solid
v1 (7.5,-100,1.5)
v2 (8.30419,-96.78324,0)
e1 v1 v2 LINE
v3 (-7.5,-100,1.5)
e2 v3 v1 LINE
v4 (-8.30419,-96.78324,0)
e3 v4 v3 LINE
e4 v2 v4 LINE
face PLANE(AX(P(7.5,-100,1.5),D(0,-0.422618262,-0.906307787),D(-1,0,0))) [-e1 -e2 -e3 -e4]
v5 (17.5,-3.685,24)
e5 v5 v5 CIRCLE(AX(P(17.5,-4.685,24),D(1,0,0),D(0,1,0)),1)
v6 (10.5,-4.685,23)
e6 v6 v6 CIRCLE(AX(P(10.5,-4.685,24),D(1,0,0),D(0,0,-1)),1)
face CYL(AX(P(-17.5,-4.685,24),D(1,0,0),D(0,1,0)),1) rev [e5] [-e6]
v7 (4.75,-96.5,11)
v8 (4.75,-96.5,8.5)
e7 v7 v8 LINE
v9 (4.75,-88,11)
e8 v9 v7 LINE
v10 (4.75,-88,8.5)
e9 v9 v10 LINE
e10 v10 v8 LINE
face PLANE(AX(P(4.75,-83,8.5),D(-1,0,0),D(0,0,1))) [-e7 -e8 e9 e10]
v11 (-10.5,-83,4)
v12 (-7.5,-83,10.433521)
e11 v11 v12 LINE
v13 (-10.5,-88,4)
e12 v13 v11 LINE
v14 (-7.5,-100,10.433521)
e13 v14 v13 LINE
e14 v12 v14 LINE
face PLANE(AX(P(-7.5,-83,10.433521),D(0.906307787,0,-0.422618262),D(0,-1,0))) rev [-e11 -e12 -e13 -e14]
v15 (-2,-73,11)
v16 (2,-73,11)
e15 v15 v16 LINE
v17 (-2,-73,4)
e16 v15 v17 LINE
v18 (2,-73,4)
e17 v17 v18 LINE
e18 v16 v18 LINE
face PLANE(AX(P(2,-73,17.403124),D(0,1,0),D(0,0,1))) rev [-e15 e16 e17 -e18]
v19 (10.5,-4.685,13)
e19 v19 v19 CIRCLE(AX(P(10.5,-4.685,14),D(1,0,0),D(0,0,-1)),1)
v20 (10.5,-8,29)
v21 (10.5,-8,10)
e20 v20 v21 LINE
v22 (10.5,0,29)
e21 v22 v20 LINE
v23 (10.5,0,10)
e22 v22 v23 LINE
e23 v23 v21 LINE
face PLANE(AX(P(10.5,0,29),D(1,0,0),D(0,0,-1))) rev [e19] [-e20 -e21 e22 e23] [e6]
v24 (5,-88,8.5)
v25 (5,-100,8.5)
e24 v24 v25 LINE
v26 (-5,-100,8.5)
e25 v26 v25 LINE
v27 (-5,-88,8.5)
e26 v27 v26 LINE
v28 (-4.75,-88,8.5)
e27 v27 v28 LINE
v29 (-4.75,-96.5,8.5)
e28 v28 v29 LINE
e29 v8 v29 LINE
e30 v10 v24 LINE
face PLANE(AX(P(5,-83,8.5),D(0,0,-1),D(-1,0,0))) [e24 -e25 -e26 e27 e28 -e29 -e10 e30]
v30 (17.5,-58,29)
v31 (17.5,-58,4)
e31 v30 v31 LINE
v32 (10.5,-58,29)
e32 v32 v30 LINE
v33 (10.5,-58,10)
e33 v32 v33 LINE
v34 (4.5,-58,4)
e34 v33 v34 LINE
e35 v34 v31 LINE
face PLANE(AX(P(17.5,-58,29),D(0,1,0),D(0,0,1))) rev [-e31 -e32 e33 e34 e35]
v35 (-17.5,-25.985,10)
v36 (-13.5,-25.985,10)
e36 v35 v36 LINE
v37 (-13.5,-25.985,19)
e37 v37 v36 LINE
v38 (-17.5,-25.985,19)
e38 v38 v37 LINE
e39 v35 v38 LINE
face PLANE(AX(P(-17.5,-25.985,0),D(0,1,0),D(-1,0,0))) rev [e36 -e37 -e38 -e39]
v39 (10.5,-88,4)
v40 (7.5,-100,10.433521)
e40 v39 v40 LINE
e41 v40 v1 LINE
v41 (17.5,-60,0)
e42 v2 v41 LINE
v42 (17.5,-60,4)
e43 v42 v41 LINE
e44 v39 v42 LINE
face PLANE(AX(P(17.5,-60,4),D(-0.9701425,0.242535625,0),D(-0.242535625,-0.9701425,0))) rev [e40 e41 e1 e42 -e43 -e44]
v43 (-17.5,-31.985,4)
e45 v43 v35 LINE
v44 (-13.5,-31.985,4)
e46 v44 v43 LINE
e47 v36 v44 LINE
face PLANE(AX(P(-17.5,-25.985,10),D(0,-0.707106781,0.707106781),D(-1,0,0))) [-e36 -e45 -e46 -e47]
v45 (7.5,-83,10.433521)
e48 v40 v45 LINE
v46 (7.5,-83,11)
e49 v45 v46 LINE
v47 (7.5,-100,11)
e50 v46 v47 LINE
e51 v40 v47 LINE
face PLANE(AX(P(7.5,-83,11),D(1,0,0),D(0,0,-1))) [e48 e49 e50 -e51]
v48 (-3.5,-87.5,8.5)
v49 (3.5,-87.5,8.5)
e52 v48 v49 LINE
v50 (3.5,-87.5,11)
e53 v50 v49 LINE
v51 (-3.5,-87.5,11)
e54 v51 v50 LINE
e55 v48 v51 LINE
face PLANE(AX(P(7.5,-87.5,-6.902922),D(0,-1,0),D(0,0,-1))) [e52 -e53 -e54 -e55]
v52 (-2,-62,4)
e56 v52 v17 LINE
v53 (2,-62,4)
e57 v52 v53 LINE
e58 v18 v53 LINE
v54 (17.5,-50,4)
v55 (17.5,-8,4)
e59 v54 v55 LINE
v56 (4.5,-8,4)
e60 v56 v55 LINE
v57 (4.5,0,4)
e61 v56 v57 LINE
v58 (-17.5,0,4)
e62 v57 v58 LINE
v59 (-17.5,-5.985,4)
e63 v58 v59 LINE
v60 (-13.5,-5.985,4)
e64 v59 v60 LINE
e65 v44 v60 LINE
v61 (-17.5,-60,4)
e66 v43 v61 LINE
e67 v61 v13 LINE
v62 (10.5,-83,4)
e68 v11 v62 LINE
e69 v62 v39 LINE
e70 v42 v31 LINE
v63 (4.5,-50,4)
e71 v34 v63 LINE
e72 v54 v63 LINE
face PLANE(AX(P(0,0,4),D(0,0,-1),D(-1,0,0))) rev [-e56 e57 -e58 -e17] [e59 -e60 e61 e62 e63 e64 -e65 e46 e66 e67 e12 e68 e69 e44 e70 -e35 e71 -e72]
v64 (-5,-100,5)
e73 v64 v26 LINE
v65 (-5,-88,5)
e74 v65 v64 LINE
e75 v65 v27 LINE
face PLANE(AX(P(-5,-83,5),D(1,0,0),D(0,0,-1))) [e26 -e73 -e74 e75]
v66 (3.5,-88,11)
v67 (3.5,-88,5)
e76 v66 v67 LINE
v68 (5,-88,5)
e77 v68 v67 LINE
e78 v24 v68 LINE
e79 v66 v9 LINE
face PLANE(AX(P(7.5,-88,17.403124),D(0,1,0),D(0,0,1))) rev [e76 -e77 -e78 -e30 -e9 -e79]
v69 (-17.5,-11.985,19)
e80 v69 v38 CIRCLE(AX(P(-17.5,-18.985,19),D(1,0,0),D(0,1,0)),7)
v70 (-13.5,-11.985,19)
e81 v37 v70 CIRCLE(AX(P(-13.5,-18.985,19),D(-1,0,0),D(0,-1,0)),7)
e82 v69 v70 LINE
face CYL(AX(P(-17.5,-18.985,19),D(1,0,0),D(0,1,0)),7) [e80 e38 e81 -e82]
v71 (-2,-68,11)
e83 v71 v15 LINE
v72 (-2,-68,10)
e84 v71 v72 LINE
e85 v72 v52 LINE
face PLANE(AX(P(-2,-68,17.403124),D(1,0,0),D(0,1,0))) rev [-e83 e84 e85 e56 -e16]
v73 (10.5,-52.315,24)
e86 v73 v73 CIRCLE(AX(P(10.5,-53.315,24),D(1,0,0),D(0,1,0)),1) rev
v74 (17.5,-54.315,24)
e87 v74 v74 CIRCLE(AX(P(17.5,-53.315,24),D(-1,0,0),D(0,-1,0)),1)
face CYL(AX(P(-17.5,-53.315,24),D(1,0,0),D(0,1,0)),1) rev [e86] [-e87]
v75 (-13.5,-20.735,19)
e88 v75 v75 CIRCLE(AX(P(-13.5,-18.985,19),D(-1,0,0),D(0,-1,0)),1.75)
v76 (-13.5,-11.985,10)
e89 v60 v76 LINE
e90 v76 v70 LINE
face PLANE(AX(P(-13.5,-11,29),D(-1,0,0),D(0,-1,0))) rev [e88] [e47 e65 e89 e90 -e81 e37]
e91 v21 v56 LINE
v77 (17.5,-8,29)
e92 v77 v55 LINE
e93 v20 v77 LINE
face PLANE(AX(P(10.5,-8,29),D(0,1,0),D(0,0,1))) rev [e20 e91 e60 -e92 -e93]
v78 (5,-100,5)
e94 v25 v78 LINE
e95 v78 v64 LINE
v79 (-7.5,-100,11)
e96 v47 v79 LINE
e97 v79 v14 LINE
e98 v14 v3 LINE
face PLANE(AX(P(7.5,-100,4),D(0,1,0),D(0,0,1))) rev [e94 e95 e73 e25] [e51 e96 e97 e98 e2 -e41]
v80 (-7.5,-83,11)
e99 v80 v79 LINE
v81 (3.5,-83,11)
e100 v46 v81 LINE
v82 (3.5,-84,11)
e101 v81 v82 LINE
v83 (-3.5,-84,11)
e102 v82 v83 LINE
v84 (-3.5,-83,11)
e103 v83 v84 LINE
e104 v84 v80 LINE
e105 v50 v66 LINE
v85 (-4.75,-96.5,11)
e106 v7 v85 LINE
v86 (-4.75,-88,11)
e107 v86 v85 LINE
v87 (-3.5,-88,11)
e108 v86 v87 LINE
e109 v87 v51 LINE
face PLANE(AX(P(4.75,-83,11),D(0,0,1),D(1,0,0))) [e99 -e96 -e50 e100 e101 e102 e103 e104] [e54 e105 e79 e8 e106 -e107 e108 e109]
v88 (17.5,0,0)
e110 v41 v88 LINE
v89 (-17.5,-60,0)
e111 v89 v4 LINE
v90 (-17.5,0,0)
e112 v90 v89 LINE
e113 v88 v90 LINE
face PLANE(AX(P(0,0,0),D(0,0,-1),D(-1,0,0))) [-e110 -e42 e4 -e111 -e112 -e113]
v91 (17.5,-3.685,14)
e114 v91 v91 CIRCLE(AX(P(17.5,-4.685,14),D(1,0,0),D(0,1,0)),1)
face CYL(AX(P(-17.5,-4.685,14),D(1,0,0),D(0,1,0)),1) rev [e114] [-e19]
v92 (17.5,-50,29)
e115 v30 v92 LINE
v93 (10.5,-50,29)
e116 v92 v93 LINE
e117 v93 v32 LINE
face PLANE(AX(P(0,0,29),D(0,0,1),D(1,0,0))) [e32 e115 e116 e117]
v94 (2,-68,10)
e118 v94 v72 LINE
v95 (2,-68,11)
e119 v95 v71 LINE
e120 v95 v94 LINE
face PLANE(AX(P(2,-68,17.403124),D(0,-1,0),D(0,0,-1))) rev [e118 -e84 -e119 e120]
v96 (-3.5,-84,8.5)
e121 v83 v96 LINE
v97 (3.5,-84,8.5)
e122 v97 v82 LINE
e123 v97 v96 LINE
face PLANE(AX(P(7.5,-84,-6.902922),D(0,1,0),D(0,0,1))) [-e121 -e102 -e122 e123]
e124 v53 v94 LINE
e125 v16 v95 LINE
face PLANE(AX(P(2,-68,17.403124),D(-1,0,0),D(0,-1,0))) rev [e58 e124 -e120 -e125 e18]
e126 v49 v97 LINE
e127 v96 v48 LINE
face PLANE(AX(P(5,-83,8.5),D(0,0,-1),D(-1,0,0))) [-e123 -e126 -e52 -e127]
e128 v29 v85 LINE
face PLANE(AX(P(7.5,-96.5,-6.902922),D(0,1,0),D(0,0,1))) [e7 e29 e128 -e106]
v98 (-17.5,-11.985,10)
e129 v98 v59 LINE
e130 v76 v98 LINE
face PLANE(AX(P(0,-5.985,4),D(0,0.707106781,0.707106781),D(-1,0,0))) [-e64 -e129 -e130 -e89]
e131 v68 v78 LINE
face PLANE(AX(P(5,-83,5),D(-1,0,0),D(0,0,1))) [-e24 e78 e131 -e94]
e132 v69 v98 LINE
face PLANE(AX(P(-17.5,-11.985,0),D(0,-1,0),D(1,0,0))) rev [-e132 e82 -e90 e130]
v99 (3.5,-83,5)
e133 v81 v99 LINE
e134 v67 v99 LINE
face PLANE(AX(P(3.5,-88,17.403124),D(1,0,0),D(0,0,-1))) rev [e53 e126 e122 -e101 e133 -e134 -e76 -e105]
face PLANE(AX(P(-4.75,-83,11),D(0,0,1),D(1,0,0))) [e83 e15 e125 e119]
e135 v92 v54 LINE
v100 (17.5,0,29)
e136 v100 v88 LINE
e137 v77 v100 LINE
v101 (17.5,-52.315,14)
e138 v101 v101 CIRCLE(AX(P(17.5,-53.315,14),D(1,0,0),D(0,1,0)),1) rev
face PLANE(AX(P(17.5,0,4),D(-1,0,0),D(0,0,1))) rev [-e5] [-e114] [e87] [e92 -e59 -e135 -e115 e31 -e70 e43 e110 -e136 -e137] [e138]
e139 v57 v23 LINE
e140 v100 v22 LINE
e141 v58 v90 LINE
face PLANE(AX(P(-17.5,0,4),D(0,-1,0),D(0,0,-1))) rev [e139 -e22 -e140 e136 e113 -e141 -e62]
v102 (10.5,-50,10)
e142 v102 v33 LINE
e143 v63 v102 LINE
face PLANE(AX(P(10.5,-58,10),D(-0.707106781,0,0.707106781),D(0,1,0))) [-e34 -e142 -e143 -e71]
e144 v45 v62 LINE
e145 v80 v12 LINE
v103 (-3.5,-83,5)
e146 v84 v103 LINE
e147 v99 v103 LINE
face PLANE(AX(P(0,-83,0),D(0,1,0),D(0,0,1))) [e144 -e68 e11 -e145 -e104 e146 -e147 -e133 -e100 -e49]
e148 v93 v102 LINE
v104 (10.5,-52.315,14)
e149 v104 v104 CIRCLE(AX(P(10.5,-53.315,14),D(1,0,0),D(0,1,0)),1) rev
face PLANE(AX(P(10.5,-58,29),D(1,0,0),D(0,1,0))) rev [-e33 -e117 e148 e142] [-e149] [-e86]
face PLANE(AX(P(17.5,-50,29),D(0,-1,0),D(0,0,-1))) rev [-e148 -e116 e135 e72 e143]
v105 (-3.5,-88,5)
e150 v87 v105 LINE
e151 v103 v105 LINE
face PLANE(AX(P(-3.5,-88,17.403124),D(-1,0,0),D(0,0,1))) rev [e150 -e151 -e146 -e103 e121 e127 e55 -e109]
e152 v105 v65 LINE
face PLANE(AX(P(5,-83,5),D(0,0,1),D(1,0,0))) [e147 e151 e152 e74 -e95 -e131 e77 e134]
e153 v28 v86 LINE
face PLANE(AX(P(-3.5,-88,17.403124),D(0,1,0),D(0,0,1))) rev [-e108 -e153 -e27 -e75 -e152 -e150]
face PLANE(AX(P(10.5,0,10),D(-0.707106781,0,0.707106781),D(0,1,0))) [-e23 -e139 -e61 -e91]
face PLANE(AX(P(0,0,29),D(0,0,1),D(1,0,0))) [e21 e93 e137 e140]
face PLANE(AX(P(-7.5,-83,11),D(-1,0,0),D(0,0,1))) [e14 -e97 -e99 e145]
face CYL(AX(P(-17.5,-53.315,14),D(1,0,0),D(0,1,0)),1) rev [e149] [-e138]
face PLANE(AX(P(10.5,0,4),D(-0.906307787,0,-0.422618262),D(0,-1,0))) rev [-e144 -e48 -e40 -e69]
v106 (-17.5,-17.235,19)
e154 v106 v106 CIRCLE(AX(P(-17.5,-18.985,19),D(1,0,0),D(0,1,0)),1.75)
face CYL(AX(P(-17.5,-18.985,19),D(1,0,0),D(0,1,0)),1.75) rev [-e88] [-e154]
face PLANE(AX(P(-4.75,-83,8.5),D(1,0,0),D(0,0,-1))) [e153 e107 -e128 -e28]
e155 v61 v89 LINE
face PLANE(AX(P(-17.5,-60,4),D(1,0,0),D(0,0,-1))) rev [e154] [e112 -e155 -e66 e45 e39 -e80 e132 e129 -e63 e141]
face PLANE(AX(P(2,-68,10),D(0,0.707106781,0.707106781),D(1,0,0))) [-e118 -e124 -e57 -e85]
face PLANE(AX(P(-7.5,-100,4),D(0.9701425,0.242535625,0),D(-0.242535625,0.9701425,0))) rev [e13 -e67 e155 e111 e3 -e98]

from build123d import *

# Parameters (mm, degrees)
RESSALTO_EXTRUS_O1_DEPTH    = 4
ESBO_O2_W                   = 7
ESBO_O2_H                   = 8
ESBO_O2_W_2                 = 4
ESBO_O2_H_2                 = 16
RESSALTO_EXTRUS_O2_DEPTH    = 25
CORTE_EXTRUS_O1_START       = -35
CORTE_EXTRUS_O1_OUTLINE_R   = 1.75
CORTE_EXTRUS_O1_OUTLINE_R_2 = 1
CORTE_EXTRUS_O1_DEPTH       = 35
RESSALTO_EXTRUS_O3_DEPTH    = 17
RESSALTO_EXTRUS_O4_REACH    = 106.553
ESBO_O7_W                   = 4
ESBO_O7_H                   = 5
ESBO_O8_W                   = 15
ESBO_O8_H                   = 3.5
RESSALTO_EXTRUS_O5_DEPTH    = 2.5
CHANFRO1_SIZE               = 6
CHANFRO2_SIZE               = 3
CHANFRO2_SIZE2              = 6.433520762
CHANFRO3_SIZE               = 1.5
CHANFRO3_SIZE2              = 3.216760381


# Read off the part's stored shape, not the designer's step: Corte-extrusão1
with BuildPart() as part:
    # Esboço1 → Ressalto-extrusão1 (new body)
    with BuildSketch(Plane.XY):
        Polygon((-17.5, 0), (17.5, 0), (17.5, -60), (7.5, -100), (-7.5, -100), (-17.5, -60), align=None)
    extrude(amount=RESSALTO_EXTRUS_O1_DEPTH)

    # Esboço2 → Ressalto-extrusão2 (add)
    with BuildSketch(Plane.XY.offset(4)):
        with Locations((14, -54)):
            Rectangle(ESBO_O2_W, ESBO_O2_H)
        with Locations((14, -4)):
            Rectangle(ESBO_O2_W, ESBO_O2_H)
        with Locations((-15.5, -19)):
            Rectangle(ESBO_O2_W_2, ESBO_O2_H_2)
    extrude(amount=RESSALTO_EXTRUS_O2_DEPTH)

    # Corte-extrusão1 outline → Corte-extrusão1 (cut)
    with BuildSketch(Plane(origin=(17.5, 0, 0), x_dir=(0, 0, -1), z_dir=(1, 0, 0)).offset(CORTE_EXTRUS_O1_START)):
        with Locations((-19, -18.985)):
            Circle(CORTE_EXTRUS_O1_OUTLINE_R)
        with BuildLine():
            ThreePointArc((-19, -25.985), (-26, -18.985), (-19, -11.985))
            Line((-19, -11.985), (-4, -11.985))
            Line((-4, -11.985), (-4, -11))
            Line((-4, -11), (-29, -11))
            Line((-29, -11), (-29, -27))
            Line((-29, -27), (-4, -27))
            Line((-4, -27), (-4, -25.985))
            Line((-4, -25.985), (-19, -25.985))
        make_face()
        with Locations((-24, -4.685)):
            Circle(CORTE_EXTRUS_O1_OUTLINE_R_2)
        with Locations((-14, -4.685)):
            Circle(CORTE_EXTRUS_O1_OUTLINE_R_2)
        with Locations((-14, -53.315)):
            Circle(CORTE_EXTRUS_O1_OUTLINE_R_2)
        with Locations((-24, -53.315)):
            Circle(CORTE_EXTRUS_O1_OUTLINE_R_2)
    extrude(amount=CORTE_EXTRUS_O1_DEPTH, mode=Mode.SUBTRACT)

    # Esboço6 → Ressalto-extrusão3 (add)
    with BuildSketch(Plane.XZ.offset(100)):
        Polygon((-5, 5), (-5, 8.5), (-4.75, 8.5), (-4.75, 11), (-7.5, 11), (-7.5, 4), (7.5, 4), (7.5, 11), (4.75, 11), (4.75, 8.5), (5, 8.5), (5, 5), align=None)
    extrude(amount=-RESSALTO_EXTRUS_O3_DEPTH)

    # Ressalto-extrusão4: up to this face of the body (flat: up to its plane)
    ressalto_extrus_o4_end = Plane(part.part.faces().sort_by_distance((-6.125, -91.5, 11))[0])
    # Esboço7 → Ressalto-extrusão4 (add, up to the picked face)
    with BuildSketch(Plane.XY.offset(4), mode=Mode.PRIVATE) as ressalto_extrus_o4_sk1:
        with Locations((0, -70.5)):
            Rectangle(ESBO_O7_W, ESBO_O7_H)
    ressalto_extrus_o4_tool1 = split(extrude(ressalto_extrus_o4_sk1.sketch, amount=RESSALTO_EXTRUS_O4_REACH, mode=Mode.PRIVATE), bisect_by=ressalto_extrus_o4_end, keep=Keep.BOTH, mode=Mode.PRIVATE)
    # Esboço7 → Ressalto-extrusão4 (add, up to the picked face)
    with BuildSketch(Plane.XY.offset(4), mode=Mode.PRIVATE) as ressalto_extrus_o4_sk2:
        with Locations((5.5, -85.5)):
            Rectangle(ESBO_O7_W, ESBO_O7_H)
    ressalto_extrus_o4_tool2 = split(extrude(ressalto_extrus_o4_sk2.sketch, amount=RESSALTO_EXTRUS_O4_REACH, mode=Mode.PRIVATE), bisect_by=ressalto_extrus_o4_end, keep=Keep.BOTH, mode=Mode.PRIVATE)
    # Esboço7 → Ressalto-extrusão4 (add, up to the picked face)
    with BuildSketch(Plane.XY.offset(4), mode=Mode.PRIVATE) as ressalto_extrus_o4_sk3:
        with Locations((-5.5, -85.5)):
            Rectangle(ESBO_O7_W, ESBO_O7_H)
    ressalto_extrus_o4_tool3 = split(extrude(ressalto_extrus_o4_sk3.sketch, amount=RESSALTO_EXTRUS_O4_REACH, mode=Mode.PRIVATE), bisect_by=ressalto_extrus_o4_end, keep=Keep.BOTH, mode=Mode.PRIVATE)
    add(ressalto_extrus_o4_tool1.solids().sort_by(Axis((0, -70.5, 4), (0, 0, 1)))[0])
    add(ressalto_extrus_o4_tool2.solids().sort_by(Axis((5.5, -85.5, 4), (0, 0, 1)))[0])
    add(ressalto_extrus_o4_tool3.solids().sort_by(Axis((-5.5, -85.5, 4), (0, 0, 1)))[0])

    # Esboço8 → Ressalto-extrusão5 (add)
    with BuildSketch(Plane.XY.offset(11)):
        with Locations((0, -98.25)):
            Rectangle(ESBO_O8_W, ESBO_O8_H)
        with Locations((0, -85.75)):
            Rectangle(ESBO_O8_W, ESBO_O8_H)
    extrude(amount=-RESSALTO_EXTRUS_O5_DEPTH)

    # Chanfro1
    chanfro1_edges = [part.edges().sort_by_distance(p)[0] for p in [
        (0, -68, 4),
        (10.5, -54, 4),
        (10.5, -4, 4),
        (-15.5, -11.985, 4),
        (-15.5, -25.985, 4),
    ]]
    chamfer(chanfro1_edges, length=CHANFRO1_SIZE)

    # Chanfro2
    chanfro2_edges = [part.edges().sort_by_distance(p)[0] for p in [
        (7.5, -91.5, 4),
        (-7.5, -91.5, 4),
    ]]
    chanfro2_side = [part.faces().sort_by_distance(p)[0] for p in [
        (-0.271595018, -42.597184947, 4),
    ]]
    chamfer(chanfro2_edges, length=CHANFRO2_SIZE, length2=CHANFRO2_SIZE2, reference=chanfro2_side[0])

    # Chanfro3
    chanfro3_edges = [part.edges().sort_by_distance(p)[0] for p in [
        (0, -100, 0),
    ]]
    chanfro3_side = [part.faces().sort_by_distance(p)[0] for p in [
        (7.313989248, -100, 10.716760381),
    ]]
    chamfer(chanfro3_edges, length=CHANFRO3_SIZE, length2=CHANFRO3_SIZE2, reference=chanfro3_side[0])


solid = part.part
